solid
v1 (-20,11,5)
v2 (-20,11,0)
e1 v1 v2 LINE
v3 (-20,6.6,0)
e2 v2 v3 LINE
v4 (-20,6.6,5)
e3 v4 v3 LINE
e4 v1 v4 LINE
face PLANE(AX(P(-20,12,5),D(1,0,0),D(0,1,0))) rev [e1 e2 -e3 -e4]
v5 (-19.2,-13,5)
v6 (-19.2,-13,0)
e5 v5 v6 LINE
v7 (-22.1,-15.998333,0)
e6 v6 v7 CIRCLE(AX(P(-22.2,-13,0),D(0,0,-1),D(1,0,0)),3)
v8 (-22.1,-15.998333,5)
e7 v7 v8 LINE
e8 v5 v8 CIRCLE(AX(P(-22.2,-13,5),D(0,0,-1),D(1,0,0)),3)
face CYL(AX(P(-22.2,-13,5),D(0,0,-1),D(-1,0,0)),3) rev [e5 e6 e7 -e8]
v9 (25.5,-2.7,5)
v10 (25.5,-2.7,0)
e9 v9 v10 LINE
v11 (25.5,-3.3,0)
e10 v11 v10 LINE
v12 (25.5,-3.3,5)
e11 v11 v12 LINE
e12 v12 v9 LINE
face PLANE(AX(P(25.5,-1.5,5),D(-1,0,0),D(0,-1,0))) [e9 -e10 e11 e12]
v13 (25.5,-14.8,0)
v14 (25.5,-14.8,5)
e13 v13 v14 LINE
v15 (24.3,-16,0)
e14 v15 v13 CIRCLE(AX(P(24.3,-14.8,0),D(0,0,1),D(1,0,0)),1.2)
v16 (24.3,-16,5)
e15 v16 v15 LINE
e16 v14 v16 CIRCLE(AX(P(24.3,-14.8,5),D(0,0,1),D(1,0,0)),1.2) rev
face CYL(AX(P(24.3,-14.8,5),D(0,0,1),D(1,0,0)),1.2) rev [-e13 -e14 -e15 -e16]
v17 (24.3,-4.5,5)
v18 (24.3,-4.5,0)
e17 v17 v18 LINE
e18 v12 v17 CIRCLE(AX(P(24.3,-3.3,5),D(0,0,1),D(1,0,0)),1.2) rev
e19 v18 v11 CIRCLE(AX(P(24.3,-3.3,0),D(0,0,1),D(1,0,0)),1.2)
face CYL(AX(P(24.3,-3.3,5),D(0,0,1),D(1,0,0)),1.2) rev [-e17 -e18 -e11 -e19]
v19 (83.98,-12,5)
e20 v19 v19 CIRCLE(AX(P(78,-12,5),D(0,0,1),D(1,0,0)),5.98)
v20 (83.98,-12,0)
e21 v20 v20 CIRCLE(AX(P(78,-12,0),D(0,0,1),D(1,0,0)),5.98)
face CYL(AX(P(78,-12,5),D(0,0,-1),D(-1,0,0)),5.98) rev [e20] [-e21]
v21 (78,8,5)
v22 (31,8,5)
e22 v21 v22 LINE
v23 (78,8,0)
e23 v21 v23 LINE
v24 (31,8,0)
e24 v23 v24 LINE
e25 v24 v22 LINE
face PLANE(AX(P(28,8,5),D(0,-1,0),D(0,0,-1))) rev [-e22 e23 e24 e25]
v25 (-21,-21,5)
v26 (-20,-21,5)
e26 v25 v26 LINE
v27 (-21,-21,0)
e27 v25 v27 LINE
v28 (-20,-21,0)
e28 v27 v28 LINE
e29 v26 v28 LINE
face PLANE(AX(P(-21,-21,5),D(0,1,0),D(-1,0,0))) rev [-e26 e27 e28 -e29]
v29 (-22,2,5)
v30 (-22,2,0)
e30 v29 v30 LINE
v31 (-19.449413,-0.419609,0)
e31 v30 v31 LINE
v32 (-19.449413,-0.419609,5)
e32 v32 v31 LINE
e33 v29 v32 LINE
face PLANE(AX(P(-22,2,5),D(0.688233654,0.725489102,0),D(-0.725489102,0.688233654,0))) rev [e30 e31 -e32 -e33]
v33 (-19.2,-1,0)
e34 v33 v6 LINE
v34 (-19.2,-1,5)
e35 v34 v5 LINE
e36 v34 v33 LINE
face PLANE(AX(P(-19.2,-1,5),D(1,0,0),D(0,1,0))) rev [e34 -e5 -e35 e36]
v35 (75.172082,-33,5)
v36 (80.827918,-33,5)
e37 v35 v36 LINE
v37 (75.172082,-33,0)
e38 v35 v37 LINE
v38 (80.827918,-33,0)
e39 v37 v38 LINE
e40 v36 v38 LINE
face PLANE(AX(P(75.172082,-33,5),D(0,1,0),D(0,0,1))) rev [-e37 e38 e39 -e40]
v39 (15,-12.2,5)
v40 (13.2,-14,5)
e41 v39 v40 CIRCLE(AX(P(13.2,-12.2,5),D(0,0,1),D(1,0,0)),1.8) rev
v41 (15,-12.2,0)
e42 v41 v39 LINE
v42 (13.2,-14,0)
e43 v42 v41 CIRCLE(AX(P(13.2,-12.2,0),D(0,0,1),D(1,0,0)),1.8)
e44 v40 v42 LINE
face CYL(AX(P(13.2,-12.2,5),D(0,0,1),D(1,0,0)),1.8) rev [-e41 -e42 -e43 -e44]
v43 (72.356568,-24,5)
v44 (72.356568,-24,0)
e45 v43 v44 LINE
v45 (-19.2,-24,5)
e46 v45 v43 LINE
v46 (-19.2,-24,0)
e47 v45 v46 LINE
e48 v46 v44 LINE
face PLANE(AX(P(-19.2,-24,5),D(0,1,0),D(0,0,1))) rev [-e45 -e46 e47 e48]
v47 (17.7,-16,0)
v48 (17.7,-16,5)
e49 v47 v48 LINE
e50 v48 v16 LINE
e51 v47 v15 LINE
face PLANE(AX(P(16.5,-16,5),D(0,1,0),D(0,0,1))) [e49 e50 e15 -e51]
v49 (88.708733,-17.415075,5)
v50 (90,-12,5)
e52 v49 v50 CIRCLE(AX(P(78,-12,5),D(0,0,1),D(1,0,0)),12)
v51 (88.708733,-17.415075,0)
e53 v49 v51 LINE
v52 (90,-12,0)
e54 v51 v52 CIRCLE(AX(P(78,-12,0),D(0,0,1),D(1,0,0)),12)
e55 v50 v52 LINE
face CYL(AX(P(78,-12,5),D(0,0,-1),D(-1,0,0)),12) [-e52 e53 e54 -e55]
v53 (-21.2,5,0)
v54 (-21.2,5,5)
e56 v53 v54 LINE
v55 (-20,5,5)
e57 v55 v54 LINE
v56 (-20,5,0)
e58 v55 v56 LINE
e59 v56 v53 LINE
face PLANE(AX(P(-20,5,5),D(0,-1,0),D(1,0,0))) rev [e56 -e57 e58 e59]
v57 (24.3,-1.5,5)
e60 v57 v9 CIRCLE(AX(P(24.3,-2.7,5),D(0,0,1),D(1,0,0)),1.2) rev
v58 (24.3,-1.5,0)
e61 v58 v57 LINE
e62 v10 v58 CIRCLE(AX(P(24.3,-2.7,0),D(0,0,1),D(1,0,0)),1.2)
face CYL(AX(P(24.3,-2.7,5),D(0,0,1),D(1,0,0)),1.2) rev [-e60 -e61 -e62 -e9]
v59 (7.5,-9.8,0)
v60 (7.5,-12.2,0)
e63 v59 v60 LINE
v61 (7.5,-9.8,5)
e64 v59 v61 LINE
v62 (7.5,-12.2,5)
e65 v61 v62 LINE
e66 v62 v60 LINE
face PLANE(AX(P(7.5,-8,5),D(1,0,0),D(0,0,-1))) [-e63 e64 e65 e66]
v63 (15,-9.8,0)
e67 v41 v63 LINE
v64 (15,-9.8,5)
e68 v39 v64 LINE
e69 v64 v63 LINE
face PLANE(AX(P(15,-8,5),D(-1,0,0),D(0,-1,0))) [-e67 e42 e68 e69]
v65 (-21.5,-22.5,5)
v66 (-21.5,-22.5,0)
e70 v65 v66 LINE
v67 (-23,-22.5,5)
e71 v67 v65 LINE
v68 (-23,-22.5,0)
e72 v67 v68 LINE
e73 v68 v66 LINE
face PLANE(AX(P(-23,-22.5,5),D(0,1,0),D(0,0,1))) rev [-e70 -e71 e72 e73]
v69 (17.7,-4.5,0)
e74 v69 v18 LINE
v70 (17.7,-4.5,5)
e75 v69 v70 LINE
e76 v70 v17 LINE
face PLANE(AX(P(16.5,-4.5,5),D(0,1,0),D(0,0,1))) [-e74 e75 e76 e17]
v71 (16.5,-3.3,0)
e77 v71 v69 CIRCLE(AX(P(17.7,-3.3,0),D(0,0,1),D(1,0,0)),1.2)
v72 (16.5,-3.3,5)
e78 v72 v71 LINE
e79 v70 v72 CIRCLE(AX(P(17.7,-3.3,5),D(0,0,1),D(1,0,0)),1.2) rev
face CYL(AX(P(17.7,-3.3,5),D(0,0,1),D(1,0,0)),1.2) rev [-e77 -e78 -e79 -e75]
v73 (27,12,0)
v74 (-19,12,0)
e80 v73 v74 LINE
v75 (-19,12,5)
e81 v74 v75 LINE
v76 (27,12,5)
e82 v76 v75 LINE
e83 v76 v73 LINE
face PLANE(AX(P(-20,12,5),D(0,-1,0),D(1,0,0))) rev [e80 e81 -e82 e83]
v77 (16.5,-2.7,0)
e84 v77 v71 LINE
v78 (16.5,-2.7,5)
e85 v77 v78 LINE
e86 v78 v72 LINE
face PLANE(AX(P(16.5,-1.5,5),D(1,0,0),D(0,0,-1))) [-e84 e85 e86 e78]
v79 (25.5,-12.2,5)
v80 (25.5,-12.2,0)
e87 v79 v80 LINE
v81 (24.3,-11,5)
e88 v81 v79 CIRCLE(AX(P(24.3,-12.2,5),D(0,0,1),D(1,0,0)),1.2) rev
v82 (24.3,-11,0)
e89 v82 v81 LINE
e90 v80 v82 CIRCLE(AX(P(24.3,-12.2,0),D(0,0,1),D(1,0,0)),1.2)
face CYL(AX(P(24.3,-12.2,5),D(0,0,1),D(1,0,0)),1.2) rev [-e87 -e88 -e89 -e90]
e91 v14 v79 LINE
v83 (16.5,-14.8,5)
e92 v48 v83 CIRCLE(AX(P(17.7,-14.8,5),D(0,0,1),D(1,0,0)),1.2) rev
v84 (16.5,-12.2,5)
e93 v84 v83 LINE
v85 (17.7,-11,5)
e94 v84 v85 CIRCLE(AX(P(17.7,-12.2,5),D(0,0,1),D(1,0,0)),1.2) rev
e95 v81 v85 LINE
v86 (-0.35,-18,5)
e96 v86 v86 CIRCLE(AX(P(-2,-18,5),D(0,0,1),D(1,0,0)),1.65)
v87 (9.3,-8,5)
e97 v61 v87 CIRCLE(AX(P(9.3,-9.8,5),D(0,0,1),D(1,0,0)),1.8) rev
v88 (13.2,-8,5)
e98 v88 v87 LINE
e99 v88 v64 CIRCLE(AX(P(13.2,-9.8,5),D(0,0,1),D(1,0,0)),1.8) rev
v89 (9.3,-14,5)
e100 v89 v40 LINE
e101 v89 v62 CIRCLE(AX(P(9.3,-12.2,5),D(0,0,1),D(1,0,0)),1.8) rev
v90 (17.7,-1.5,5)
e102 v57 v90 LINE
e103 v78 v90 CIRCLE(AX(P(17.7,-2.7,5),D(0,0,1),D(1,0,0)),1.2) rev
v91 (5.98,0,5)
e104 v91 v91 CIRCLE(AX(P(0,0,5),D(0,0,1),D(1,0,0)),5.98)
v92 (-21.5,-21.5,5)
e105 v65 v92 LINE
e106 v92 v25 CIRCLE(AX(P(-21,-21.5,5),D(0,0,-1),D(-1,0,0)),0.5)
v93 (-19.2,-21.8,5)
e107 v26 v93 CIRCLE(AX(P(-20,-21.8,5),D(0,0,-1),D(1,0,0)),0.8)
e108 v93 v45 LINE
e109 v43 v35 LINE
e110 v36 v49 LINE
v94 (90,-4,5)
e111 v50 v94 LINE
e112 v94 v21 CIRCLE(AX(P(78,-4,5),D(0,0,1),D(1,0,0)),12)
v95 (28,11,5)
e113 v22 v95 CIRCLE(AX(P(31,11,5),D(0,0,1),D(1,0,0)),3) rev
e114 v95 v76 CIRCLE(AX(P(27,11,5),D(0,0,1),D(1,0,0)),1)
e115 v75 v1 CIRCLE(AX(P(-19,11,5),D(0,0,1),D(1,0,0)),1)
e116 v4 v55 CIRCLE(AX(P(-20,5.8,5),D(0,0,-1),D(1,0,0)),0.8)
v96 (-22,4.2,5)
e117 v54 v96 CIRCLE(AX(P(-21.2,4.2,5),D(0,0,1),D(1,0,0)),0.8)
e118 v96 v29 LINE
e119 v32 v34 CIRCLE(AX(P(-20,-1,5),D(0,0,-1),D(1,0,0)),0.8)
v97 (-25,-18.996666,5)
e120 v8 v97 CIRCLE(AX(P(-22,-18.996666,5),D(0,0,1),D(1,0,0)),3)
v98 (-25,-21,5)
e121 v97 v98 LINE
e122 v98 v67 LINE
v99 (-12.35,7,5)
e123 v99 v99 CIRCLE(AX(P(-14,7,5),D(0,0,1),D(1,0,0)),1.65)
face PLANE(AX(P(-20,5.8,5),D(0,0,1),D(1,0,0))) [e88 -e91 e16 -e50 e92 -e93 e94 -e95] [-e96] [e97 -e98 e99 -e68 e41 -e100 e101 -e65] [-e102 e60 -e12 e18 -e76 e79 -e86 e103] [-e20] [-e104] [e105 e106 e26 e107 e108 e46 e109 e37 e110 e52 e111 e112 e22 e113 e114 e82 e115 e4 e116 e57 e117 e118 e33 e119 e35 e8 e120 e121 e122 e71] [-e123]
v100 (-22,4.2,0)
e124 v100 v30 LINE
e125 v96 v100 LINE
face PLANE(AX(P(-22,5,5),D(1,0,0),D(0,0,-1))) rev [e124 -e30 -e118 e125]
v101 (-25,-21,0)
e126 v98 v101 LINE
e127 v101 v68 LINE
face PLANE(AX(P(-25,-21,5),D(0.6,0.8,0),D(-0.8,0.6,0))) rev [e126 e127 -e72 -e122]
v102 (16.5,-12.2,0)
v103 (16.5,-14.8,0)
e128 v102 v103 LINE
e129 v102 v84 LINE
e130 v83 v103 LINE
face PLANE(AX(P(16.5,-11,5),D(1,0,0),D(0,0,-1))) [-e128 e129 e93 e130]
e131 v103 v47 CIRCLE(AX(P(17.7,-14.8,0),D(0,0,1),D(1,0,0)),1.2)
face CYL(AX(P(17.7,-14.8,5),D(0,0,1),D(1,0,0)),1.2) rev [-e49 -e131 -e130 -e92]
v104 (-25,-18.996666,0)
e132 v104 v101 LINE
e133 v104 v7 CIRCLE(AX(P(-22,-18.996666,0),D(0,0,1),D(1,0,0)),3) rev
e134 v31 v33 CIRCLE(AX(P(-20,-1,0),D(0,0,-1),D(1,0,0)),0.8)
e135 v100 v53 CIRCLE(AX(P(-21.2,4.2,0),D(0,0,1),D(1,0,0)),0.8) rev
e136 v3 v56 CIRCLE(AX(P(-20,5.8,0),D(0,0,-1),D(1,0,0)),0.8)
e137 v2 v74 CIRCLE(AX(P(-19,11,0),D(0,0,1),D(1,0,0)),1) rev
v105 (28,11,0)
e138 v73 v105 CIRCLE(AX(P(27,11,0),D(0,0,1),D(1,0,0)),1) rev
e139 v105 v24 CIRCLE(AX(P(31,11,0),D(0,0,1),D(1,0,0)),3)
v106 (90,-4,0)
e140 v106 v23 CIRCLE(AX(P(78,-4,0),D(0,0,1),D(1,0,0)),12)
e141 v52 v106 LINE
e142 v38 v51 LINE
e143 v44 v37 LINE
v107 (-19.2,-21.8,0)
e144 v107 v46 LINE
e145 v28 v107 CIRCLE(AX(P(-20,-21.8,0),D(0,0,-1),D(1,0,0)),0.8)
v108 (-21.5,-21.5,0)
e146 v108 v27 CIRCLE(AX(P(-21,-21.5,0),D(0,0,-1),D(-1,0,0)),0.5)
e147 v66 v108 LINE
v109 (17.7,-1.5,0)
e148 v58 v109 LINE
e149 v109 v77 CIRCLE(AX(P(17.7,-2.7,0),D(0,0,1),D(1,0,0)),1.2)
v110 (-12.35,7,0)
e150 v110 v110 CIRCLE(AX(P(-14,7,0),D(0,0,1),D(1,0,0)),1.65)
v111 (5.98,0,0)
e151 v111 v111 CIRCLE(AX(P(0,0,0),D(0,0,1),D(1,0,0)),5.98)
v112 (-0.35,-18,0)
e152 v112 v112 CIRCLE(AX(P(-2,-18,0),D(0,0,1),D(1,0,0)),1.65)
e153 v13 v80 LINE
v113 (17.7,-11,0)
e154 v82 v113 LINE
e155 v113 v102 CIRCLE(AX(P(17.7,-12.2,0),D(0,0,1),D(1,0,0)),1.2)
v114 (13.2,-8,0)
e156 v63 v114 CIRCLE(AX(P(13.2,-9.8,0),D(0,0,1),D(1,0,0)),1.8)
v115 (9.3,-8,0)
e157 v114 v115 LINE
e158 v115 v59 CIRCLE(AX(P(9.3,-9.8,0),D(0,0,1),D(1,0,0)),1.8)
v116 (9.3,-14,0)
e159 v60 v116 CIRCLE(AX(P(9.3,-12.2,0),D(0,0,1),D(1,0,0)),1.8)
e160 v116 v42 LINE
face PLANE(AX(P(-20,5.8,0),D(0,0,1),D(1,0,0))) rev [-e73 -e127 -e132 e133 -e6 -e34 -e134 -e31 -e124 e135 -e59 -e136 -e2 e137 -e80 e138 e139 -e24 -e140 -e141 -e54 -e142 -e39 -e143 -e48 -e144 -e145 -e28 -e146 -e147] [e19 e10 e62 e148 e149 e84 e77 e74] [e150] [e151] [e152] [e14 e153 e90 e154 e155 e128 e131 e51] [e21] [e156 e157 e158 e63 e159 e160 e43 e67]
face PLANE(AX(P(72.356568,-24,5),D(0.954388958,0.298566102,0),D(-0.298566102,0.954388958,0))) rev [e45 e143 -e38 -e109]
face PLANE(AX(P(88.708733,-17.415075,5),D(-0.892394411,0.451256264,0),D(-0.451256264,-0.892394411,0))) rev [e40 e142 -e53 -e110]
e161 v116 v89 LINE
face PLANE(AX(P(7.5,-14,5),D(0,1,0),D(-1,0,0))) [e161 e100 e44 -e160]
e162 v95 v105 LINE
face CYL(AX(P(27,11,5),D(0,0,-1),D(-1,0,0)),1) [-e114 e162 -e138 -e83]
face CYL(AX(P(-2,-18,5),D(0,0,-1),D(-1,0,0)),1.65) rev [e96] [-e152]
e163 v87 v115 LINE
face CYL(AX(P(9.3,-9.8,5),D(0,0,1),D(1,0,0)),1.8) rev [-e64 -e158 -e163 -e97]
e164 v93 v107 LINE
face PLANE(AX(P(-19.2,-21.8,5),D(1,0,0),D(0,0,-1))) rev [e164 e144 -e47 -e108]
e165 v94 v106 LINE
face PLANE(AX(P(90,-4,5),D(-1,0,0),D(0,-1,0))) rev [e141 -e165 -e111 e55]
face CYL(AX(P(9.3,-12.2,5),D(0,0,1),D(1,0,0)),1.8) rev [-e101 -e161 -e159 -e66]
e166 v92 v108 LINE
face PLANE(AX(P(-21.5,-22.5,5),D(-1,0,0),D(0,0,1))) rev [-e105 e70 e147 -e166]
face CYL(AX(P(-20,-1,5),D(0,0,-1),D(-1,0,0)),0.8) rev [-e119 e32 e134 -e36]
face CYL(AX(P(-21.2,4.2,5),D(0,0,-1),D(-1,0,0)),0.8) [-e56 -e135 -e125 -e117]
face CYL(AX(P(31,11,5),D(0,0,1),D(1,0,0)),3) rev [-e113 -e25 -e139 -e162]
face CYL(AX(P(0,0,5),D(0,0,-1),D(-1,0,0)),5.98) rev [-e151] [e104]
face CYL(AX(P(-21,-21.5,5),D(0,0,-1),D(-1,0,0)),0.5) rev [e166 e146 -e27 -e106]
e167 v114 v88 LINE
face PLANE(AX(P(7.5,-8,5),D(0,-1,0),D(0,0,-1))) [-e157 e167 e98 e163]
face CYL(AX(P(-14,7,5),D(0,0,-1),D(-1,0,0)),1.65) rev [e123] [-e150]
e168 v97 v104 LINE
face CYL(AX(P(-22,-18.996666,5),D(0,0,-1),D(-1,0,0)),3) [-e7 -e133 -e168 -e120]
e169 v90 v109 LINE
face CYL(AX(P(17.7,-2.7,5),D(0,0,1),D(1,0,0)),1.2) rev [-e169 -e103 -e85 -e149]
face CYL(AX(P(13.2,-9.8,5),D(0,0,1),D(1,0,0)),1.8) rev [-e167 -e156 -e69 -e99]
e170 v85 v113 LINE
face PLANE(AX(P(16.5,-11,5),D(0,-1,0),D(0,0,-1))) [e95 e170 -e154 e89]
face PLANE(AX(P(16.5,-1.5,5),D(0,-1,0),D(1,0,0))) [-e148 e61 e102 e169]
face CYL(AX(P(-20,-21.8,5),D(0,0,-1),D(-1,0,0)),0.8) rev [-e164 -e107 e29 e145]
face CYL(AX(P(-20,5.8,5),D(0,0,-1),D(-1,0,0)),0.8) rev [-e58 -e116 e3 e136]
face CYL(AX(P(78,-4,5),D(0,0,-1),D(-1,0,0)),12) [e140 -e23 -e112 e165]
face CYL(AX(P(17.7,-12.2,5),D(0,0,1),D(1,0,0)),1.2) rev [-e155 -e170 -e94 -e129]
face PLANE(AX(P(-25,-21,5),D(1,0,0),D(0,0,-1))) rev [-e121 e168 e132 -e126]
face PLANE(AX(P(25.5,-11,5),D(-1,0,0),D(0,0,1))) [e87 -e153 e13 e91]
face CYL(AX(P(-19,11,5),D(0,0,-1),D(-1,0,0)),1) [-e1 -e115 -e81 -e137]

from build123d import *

# Parameters (mm, degrees)
SKETCH1_R           = 5.98
SKETCH1_R_2         = 1.65
SKETCH1_W           = 9
SKETCH1_H           = 5
SKETCH1_H_2         = 3
SKETCH1_W_2         = 7.5
SKETCH1_H_3         = 6
BOSS_EXTRUDE1_DEPTH = 5
FILLET1_R           = 1.2
FILLET2_R           = 3
FILLET3_R           = 1
FILLET5_R           = 1.8
FILLET6_R           = 0.8
FILLET7_R           = 3


with BuildPart() as part:
    # Sketch1 → Boss-Extrude1 (new body)
    with BuildSketch(Plane.XY):
        with BuildLine():
            Line((72.356568311, -24), (75.172081726, -33))
            Line((75.172081726, -33), (80.827918274, -33))
            Line((80.827918274, -33), (88.70873293, -17.415075165))
            ThreePointArc((88.70873293, -17.415075165), (89.67272023, -14.78345153), (90, -12))
            Line((90, -12), (90, -4))
            ThreePointArc((90, -4), (86.485281374, 4.485281374), (78, 8))
            Line((78, 8), (28, 8))
            Line((28, 8), (28, 12))
            Line((28, 12), (-20, 12))
            Line((-20, 12), (-20, 6.6))
            ThreePointArc((-20, 6.6), (-19.2, 5.8), (-20, 5))
            Line((-20, 5), (-22, 5))
            Line((-22, 5), (-22, 2))
            Line((-22, 2), (-19.449413077, -0.419608718))
            ThreePointArc((-19.449413077, -0.419608718), (-19.264993354, -0.684143655), (-19.2, -1))
            Line((-19.2, -1), (-19.2, -13))
            ThreePointArc((-19.2, -13), (-20.078679656, -15.121320344), (-22.2, -16))
            Line((-22.2, -16), (-25, -16))
            Line((-25, -16), (-25, -21))
            Line((-25, -21), (-23, -22.5))
            Line((-23, -22.5), (-21.5, -22.5))
            Line((-21.5, -22.5), (-21.5, -21.5))
            ThreePointArc((-21.5, -21.5), (-21.353553391, -21.146446609), (-21, -21))
            Line((-21, -21), (-20, -21))
            ThreePointArc((-20, -21), (-19.434314575, -21.234314575), (-19.2, -21.8))
            Line((-19.2, -21.8), (-19.2, -24))
            Line((-19.2, -24), (72.356568311, -24))
        make_face()
        Circle(SKETCH1_R, mode=Mode.SUBTRACT)
        with Locations((78, -12)):
            Circle(SKETCH1_R, mode=Mode.SUBTRACT)
        with Locations((-14, 7)):
            Circle(SKETCH1_R_2, mode=Mode.SUBTRACT)
        with Locations((-2, -18)):
            Circle(SKETCH1_R_2, mode=Mode.SUBTRACT)
        with Locations((21, -13.5)):
            Rectangle(SKETCH1_W, SKETCH1_H, mode=Mode.SUBTRACT)
        with Locations((21, -3)):
            Rectangle(SKETCH1_W, SKETCH1_H_2, mode=Mode.SUBTRACT)
        with Locations((11.25, -11)):
            Rectangle(SKETCH1_W_2, SKETCH1_H_3, mode=Mode.SUBTRACT)
    extrude(amount=BOSS_EXTRUDE1_DEPTH)

    # Fillet1
    fillet1_edges = [part.edges().sort_by_distance(p)[0] for p in [
        (16.5, -11, 2.5),
        (16.5, -16, 2.5),
        (25.5, -16, 2.5),
        (25.5, -11, 2.5),
        (16.5, -1.5, 2.5),
        (16.5, -4.5, 2.5),
        (25.5, -4.5, 2.5),
        (25.5, -1.5, 2.5),
    ]]
    fillet(fillet1_edges, radius=FILLET1_R)

    # Fillet2
    fillet2_edges = [part.edges().sort_by_distance(p)[0] for p in [
        (28, 8, 2.5),
    ]]
    fillet(fillet2_edges, radius=FILLET2_R)

    # Fillet3
    fillet3_edges = [part.edges().sort_by_distance(p)[0] for p in [
        (28, 12, 2.5),
        (-20, 12, 2.5),
    ]]
    fillet(fillet3_edges, radius=FILLET3_R - 0.0001)  # a hair under: the kernel refuses the full size

    # Fillet5
    fillet5_edges = [part.edges().sort_by_distance(p)[0] for p in [
        (7.5, -8, 2.5),
        (7.5, -14, 2.5),
        (15, -14, 2.5),
        (15, -8, 2.5),
    ]]
    fillet(fillet5_edges, radius=FILLET5_R)

    # Fillet6
    fillet6_edges = [part.edges().sort_by_distance(p)[0] for p in [
        (-22, 5, 2.5),
    ]]
    fillet(fillet6_edges, radius=FILLET6_R)

    # Fillet7
    fillet7_edges = [part.edges().sort_by_distance(p)[0] for p in [
        (-25, -16, 2.5),
    ]]
    fillet(fillet7_edges, radius=FILLET7_R)


solid = part.part
